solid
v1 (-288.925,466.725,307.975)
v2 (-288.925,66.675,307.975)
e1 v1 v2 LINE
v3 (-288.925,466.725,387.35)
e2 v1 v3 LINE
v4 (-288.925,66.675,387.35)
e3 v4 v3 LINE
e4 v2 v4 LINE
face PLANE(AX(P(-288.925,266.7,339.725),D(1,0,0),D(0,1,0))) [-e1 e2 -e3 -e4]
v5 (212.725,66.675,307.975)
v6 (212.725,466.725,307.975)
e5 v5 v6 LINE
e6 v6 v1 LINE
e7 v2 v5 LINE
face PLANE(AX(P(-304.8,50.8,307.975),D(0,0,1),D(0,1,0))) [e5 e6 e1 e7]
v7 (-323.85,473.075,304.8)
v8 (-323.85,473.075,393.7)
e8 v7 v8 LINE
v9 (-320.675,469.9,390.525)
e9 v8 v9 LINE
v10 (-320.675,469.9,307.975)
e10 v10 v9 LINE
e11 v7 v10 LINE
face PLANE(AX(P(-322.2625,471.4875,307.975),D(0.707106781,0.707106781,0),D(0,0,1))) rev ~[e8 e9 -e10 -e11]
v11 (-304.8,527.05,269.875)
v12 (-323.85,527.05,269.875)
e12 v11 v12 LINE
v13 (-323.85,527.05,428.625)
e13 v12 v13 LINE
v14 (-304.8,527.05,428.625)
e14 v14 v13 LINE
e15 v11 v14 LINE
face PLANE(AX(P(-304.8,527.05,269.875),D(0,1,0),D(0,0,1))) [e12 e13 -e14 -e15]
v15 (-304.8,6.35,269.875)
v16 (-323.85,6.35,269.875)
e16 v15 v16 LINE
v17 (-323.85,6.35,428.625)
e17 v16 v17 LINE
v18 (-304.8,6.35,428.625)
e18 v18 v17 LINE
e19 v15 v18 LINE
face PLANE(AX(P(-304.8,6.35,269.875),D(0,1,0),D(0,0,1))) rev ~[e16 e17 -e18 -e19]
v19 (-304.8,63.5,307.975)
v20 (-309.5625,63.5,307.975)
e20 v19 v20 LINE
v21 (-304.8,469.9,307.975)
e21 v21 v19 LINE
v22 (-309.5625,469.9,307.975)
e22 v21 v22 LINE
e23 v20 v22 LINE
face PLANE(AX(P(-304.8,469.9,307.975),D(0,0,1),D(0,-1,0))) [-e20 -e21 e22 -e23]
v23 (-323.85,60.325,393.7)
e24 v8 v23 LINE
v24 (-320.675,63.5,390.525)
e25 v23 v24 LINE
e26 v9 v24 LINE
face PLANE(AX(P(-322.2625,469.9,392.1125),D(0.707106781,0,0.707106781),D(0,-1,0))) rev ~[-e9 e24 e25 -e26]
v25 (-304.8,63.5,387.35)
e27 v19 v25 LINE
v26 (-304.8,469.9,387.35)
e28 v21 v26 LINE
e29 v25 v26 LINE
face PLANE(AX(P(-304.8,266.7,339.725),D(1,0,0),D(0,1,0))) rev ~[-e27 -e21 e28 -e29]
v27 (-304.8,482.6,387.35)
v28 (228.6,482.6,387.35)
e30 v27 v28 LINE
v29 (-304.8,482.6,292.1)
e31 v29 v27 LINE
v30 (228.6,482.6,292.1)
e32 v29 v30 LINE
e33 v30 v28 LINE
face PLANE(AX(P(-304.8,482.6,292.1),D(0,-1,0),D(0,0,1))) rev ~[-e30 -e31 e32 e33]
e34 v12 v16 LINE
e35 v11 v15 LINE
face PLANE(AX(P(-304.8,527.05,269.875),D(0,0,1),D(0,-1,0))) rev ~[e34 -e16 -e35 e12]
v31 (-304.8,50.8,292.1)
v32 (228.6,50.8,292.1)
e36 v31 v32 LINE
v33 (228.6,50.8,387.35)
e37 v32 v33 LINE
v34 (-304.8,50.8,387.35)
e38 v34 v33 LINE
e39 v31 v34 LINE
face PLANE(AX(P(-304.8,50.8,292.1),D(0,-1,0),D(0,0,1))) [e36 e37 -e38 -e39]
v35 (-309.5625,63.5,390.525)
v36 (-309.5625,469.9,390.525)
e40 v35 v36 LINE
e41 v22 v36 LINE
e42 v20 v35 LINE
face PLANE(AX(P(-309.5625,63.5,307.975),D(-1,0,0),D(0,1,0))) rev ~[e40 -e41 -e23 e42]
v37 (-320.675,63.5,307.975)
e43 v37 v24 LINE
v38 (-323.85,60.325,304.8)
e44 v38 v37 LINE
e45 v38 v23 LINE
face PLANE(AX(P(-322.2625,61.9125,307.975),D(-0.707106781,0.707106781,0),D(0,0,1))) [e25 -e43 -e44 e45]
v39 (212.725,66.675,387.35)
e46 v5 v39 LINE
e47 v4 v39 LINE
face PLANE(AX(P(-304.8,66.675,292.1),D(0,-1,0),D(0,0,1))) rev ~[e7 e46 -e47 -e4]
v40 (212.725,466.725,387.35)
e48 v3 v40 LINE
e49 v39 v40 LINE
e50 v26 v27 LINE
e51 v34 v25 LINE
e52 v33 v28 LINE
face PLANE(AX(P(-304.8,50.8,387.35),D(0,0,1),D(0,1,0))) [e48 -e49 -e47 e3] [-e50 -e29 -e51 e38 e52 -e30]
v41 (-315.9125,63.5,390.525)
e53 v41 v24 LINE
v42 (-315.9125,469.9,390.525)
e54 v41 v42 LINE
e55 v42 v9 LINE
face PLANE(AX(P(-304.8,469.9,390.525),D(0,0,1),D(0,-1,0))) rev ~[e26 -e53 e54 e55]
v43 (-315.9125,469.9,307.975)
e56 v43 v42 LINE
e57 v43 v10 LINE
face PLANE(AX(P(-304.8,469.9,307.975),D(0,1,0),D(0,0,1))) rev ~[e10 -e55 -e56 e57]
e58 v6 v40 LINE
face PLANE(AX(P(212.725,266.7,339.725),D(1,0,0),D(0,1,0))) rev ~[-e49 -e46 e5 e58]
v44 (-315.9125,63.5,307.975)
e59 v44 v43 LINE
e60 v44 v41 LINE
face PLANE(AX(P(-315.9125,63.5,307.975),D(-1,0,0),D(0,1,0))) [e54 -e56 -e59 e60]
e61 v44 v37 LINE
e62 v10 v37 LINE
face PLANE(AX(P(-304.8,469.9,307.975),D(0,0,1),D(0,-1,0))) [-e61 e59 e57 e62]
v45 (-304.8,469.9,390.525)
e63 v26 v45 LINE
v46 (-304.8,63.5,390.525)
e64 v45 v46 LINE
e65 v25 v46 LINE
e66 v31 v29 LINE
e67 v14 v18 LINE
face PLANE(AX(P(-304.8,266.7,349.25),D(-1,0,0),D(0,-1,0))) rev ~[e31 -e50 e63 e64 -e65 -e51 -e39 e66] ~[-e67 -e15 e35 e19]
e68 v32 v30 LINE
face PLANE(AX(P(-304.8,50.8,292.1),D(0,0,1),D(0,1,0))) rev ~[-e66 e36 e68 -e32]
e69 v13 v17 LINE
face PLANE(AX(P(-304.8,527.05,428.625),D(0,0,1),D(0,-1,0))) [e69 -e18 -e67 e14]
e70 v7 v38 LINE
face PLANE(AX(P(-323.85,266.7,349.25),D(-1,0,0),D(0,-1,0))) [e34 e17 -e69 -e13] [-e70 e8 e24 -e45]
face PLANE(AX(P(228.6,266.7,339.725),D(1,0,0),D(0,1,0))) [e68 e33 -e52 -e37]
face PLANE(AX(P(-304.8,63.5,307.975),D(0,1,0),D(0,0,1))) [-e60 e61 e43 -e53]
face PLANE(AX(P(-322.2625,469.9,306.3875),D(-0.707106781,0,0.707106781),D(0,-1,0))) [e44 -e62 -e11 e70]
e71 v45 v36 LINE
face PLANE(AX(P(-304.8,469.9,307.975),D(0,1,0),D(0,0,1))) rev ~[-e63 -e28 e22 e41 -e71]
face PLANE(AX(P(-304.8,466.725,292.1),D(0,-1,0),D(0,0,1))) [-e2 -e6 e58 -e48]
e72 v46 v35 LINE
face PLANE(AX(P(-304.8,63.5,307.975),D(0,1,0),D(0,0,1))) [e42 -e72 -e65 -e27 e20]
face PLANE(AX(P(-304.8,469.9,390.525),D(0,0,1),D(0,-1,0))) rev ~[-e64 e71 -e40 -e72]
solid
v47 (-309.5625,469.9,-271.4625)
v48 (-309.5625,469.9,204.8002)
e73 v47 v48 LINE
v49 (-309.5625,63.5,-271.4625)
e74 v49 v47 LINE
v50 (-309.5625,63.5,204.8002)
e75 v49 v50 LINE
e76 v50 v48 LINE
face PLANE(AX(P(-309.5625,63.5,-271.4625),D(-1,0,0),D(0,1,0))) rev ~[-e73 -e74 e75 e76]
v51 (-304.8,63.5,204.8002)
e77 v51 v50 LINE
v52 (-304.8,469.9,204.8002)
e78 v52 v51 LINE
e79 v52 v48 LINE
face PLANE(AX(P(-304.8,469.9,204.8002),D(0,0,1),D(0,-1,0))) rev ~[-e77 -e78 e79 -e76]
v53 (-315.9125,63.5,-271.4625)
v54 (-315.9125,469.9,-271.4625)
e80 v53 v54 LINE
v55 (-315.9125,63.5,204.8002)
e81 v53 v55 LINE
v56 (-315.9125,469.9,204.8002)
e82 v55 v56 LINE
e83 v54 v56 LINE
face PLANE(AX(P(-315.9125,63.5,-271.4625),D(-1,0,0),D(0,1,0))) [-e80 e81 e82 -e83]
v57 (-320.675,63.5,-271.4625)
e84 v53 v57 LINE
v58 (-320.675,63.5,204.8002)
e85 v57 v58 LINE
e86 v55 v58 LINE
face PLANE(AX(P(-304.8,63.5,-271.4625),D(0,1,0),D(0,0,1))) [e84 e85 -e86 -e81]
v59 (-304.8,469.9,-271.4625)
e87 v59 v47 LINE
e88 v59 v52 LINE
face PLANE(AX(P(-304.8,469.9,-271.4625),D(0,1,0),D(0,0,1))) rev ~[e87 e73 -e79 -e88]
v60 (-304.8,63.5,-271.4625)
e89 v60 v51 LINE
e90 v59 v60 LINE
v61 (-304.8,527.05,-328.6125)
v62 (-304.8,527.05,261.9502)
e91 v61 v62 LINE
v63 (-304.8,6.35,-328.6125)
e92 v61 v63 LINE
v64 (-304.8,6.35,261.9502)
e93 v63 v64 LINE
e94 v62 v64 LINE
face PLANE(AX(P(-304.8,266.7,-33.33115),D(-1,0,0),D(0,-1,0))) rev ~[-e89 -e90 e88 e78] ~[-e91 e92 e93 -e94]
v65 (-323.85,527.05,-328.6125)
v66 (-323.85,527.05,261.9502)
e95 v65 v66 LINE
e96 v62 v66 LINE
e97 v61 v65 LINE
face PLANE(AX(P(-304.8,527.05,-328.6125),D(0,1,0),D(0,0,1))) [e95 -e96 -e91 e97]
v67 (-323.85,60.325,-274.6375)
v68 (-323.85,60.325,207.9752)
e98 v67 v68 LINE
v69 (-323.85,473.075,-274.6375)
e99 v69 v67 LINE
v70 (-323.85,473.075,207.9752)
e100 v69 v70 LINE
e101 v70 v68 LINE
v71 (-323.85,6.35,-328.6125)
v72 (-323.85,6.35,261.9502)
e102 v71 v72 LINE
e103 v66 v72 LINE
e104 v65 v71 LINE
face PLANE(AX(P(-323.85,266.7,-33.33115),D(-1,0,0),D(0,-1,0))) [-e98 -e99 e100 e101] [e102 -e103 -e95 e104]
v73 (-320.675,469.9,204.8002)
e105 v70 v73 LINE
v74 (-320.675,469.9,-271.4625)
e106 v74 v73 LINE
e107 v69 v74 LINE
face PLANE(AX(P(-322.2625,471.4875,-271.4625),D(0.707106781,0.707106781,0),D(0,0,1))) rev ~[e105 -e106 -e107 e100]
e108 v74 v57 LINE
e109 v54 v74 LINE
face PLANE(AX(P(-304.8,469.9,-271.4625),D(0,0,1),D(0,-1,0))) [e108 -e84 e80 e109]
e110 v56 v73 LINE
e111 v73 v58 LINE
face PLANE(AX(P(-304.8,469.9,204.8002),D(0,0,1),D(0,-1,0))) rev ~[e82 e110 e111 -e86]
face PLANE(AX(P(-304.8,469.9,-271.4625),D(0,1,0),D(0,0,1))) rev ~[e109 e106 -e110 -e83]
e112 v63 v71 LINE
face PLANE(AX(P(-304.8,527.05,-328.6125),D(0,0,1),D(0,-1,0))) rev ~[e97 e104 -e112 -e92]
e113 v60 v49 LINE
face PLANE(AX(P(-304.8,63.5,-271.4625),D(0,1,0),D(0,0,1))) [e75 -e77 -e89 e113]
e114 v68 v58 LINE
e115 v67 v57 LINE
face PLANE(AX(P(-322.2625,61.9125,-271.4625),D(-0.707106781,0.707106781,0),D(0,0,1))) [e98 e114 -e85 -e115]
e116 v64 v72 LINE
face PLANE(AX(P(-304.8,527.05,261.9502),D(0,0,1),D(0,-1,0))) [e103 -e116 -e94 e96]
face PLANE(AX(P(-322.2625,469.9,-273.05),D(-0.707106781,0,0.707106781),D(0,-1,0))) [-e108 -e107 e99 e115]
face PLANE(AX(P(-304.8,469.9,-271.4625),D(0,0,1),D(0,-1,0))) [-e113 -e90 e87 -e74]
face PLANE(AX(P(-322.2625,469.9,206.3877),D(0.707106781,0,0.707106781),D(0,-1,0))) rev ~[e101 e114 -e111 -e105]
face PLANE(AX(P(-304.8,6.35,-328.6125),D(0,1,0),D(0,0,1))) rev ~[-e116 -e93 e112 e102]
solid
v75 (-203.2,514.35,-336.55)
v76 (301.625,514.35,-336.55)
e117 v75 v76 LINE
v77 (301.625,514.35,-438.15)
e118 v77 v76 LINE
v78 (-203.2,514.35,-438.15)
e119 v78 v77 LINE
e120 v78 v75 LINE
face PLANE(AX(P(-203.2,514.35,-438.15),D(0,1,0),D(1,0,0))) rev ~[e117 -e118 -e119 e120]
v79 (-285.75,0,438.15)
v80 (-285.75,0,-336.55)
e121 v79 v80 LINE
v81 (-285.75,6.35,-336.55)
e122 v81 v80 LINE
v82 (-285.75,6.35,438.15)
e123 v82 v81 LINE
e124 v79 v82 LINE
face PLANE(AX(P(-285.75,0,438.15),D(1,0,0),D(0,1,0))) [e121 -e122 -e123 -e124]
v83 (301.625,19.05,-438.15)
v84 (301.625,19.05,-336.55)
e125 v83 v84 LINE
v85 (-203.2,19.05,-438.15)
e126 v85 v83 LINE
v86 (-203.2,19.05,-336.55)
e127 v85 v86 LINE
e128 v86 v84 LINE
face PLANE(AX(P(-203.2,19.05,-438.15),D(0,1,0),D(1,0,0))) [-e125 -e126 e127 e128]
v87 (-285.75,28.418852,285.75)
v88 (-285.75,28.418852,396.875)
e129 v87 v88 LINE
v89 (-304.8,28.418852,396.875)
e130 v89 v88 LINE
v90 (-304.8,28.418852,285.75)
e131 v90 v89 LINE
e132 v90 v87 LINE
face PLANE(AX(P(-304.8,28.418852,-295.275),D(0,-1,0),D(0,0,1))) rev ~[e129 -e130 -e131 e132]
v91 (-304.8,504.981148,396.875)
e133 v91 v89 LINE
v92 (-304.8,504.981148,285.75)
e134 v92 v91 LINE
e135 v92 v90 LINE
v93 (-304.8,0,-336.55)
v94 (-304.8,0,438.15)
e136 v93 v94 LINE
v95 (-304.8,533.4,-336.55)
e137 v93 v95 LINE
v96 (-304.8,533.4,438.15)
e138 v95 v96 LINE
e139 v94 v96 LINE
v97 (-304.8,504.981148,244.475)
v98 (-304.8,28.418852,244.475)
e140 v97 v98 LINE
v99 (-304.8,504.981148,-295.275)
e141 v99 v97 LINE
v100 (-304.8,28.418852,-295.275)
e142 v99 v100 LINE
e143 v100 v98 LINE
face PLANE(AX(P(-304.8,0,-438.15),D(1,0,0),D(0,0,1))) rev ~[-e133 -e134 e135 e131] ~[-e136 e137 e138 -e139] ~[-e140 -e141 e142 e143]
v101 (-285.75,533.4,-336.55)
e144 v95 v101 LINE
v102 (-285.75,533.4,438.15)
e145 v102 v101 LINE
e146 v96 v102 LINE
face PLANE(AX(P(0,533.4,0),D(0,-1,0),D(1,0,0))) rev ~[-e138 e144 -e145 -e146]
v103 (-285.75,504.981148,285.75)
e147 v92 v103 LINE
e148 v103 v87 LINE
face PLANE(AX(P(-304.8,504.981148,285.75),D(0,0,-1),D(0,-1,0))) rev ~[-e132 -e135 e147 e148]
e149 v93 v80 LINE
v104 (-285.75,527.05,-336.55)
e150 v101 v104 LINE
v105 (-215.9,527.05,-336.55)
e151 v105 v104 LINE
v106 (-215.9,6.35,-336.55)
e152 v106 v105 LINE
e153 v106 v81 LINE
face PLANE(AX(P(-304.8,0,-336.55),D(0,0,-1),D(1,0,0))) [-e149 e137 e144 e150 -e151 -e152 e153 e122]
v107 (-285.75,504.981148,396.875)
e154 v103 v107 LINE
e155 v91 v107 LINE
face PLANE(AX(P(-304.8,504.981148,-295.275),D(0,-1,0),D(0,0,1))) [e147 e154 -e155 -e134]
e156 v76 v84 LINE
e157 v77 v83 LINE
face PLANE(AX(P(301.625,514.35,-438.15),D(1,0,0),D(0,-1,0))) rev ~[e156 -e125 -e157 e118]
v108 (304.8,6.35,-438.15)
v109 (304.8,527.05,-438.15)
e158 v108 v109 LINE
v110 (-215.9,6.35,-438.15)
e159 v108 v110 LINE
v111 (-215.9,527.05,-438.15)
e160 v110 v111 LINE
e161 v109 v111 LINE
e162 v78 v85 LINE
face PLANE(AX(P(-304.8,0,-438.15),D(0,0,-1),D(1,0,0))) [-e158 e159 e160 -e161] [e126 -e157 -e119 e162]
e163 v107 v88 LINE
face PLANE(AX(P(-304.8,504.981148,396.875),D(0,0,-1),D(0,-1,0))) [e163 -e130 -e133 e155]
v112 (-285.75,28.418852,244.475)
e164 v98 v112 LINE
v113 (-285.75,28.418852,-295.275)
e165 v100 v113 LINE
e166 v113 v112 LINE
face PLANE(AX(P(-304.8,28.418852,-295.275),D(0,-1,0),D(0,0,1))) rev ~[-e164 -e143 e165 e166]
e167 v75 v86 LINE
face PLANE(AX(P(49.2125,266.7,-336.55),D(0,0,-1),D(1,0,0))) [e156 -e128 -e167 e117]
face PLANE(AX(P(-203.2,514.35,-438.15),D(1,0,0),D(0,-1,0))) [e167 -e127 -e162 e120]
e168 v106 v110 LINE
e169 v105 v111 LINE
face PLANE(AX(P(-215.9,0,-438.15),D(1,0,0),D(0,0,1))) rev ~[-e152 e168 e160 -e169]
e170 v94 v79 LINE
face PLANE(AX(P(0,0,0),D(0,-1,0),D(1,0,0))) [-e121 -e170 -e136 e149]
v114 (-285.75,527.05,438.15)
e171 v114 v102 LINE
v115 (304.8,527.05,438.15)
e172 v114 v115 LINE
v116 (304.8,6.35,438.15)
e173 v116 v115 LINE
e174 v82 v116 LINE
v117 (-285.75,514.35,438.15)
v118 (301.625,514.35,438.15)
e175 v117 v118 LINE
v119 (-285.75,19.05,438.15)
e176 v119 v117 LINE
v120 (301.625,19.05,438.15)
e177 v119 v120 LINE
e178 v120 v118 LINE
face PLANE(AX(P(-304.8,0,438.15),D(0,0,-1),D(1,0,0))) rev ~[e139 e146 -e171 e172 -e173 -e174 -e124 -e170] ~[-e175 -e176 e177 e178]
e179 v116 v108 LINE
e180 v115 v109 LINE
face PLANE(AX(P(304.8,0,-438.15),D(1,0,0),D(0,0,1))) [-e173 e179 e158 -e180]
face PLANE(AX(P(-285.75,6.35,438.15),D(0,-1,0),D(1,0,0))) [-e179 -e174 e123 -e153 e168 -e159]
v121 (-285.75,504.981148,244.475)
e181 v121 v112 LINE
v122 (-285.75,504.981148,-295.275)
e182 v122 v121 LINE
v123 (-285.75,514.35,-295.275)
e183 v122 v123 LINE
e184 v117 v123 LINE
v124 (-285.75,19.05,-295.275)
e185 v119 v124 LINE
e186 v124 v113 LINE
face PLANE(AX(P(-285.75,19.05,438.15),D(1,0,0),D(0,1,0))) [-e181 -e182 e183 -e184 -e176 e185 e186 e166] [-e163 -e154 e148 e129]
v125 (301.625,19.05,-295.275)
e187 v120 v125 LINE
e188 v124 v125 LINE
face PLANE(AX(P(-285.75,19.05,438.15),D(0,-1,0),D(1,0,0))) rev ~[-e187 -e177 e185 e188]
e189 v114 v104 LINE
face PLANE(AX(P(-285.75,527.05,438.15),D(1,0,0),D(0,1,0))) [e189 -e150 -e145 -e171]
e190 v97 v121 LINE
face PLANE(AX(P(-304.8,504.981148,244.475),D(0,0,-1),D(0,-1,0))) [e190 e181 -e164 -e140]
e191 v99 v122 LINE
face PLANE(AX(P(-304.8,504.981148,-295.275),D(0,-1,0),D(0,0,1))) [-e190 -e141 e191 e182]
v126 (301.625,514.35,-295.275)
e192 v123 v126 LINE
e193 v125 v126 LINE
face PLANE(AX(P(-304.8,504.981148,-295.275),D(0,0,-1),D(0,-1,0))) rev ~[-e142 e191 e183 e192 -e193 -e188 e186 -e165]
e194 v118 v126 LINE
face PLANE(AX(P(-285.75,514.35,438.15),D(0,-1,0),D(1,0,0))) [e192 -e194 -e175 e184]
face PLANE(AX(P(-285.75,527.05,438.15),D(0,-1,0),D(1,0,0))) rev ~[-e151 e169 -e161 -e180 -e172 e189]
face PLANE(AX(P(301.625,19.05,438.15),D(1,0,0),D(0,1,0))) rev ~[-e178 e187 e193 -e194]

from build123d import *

# Parameters (mm, degrees)
F0_W          = 609.6
F0_H          = 876.3
F1_DEPTH      = 533.4
F2_W          = 88.9
F2_H          = 101.6
F3_DEPTH      = 533.401
F4_W          = 476.562295082
F4_H          = 692.15
F5_DEPTH      = 19.05
F6_W          = 590.55
F6_H          = 6.35
F7_DEPTH      = 876.301
F8_W          = 587.375
F8_H          = 495.3
F9_DEPTH      = 733.425
F10_W         = 476.562295082
F10_H         = 41.275
F11_DEPTH     = 19.05
F12_W         = 520.7
F12_H         = 590.5627
F12_W_2       = 406.4
F12_H_2       = 476.2627
F13_DEPTH     = 19.05
F14_W         = 6.35
F14_H         = 406.4
F15_DEPTH     = 476.2627
F16_SIZE      = 3.175
F17_W         = 520.7
F17_H         = 158.75
F17_W_2       = 406.4
F17_H_2       = 82.55
F18_DEPTH     = 19.05
F19_W         = 6.35
F19_H         = 406.4
F20_DEPTH     = 82.55
F21_SIZE      = 3.175
F22_W         = 504.825
F22_H         = 495.3
F23_DEPTH     = 101.6
F24_W         = 431.8
F24_H         = 95.25
F25_DEPTH     = 533.4
F26_T         = 15.875
F26_T3_DEPTH  = 37.249261314
F26_T5_DEPTH  = 37.249261314
F26_T7_DEPTH  = 37.249261314
F26_T9_DEPTH  = 37.249261314
F26_T11_DEPTH = 36.5125
F26_T13_DEPTH = 438.15
F26_T15_DEPTH = 114.3
F26_T17_DEPTH = 127
F26_T19_DEPTH = 463.55
F26_T21_DEPTH = 111.125
F26_T23_DEPTH = 36.5125


# Not quite as in the source:
# - a shell that OpenCascade refuses in one call is made with other operations: the cavity is built on its own and cut out


with BuildPart() as f1:
    # F0 (on Front) → F1 (new body)
    with BuildSketch(Plane.XZ):
        Rectangle(F0_W, F0_H)
    extrude(amount=-F1_DEPTH)

    # F2 (on face) → F3 (cut, through all)
    with BuildSketch(Plane.XZ):
        with Locations((-260.35, -387.35)):
            Rectangle(F2_W, F2_H)
    extrude(amount=-F3_DEPTH, mode=Mode.SUBTRACT)

    # F4 (on face) → F5 (cut)
    with BuildSketch(Plane(origin=(-304.8, 0, 0), x_dir=(0, -1, 0), z_dir=(-1, 0, 0))):
        with Locations((-266.7, 50.8)):
            Rectangle(F4_W, F4_H)
    extrude(amount=-F5_DEPTH, mode=Mode.SUBTRACT)

    # F6 (on face) → F7 (cut, through all)
    with BuildSketch(Plane.XY.offset(438.15)):
        with Locations((9.525, 530.225)):
            Rectangle(F6_W, F6_H)
        with Locations((9.525, 3.175)):
            Rectangle(F6_W, F6_H)
    extrude(amount=-F7_DEPTH, mode=Mode.SUBTRACT)

    # F8 (on face) → F9 (cut, through all)
    with BuildSketch(Plane.XY.offset(438.15)):
        with Locations((7.9375, 266.7)):
            Rectangle(F8_W, F8_H)
    extrude(amount=-F9_DEPTH, mode=Mode.SUBTRACT)

    # F10 (on face) → F11 (join, through all)
    with BuildSketch(Plane(origin=(-304.8, 0, 0), x_dir=(0, -1, 0), z_dir=(-1, 0, 0))):
        with Locations((-266.7, 265.1125)):
            Rectangle(F10_W, F10_H)
    extrude(amount=-F11_DEPTH)

    # F22 (on face) → F23 (cut)
    with BuildSketch(Plane(origin=(0, 0, -438.15), x_dir=(1, 0, 0), z_dir=(0, 0, -1))):
        with Locations((49.2125, -266.7)):
            Rectangle(F22_W, F22_H)
    extrude(amount=-F23_DEPTH, mode=Mode.SUBTRACT)


with BuildPart() as f13:
    # F12 (on face) → F13 (new body)
    with BuildSketch(Plane(origin=(-304.8, 0, 0), x_dir=(0, -1, 0), z_dir=(-1, 0, 0))):
        with Locations((-266.7, -33.33115)):
            Rectangle(F12_W, F12_H)
        with Locations((-266.7, -33.33115)):
            Rectangle(F12_W_2, F12_H_2, mode=Mode.SUBTRACT)
    extrude(amount=F13_DEPTH)

    # F14 (on face) → F15 (join, through all)
    with BuildSketch(Plane.XY.offset(-271.4625)):
        with Locations((-312.7375, 266.7)):
            Rectangle(F14_W, F14_H)
    extrude(amount=F15_DEPTH)

    # F16
    f16_edges = [f13.edges().sort_by_distance(p)[0] for p in [
        (-323.85, 469.9, -33.33115),
        (-323.85, 266.7, -271.4625),
        (-323.85, 63.5, -33.33115),
        (-323.85, 266.7, 204.8002),
    ]]
    chamfer(f16_edges, length=F16_SIZE)


with BuildPart() as f18:
    # F17 (on face) → F18 (new body)
    with BuildSketch(Plane(origin=(-304.8, 0, 0), x_dir=(0, -1, 0), z_dir=(-1, 0, 0))):
        with Locations((-266.7, 349.25)):
            Rectangle(F17_W, F17_H)
        with Locations((-266.7, 349.25)):
            Rectangle(F17_W_2, F17_H_2, mode=Mode.SUBTRACT)
    extrude(amount=F18_DEPTH)

    # F19 (on face) → F20 (join, through all)
    with BuildSketch(Plane.XY.offset(307.975)):
        with Locations((-312.7375, 266.7)):
            Rectangle(F19_W, F19_H)
    extrude(amount=F20_DEPTH)

    # F21
    f21_edges = [f18.edges().sort_by_distance(p)[0] for p in [
        (-323.85, 266.7, 307.975),
        (-323.85, 469.9, 349.25),
        (-323.85, 266.7, 390.525),
        (-323.85, 63.5, 349.25),
    ]]
    chamfer(f21_edges, length=F21_SIZE)

    # F24 (on face) → F25 (join)
    with BuildSketch(Plane.YZ.offset(-304.8)):
        with Locations((266.7, 339.725)):
            Rectangle(F24_W, F24_H)
    extrude(amount=F25_DEPTH)

    # F26: shell of thickness 15.875, made by hand


with BuildPart() as f26_core1:
    # F26_t2: copy of F18
    add(f18.part)

    # the walls: a layer under each face that stays
    f26_faces = [f26_core1.faces().sort_by_distance(p)[0] for p in [
        (-323.85, 440.2666666667, 296.3333333333),
        (-322.2625, 266.7, 306.3875),
        (-322.2625, 61.9125, 349.25),
        (-322.2625, 471.4875, 349.25),
        (-322.2625, 266.7, 392.1125),
        (-314.325, 266.7, 428.625),
        (-314.325, 527.05, 349.25),
        (-314.325, 266.7, 269.875),
        (-314.325, 6.35, 349.25),
        (-318.29375, 266.7, 307.975),
        (-318.29375, 63.5, 349.25),
        (-318.29375, 469.9, 349.25),
        (-318.29375, 266.7, 390.525),
        (-304.8, 440.2666666667, 402.1666666667),
        (-315.9125, 266.7, 349.25),
        (-38.1, 482.6, 339.725),
        (-38.1, 266.7, 292.1),
        (-38.1, 50.8, 339.725),
        (-307.18125, 63.5, 349.25),
        (-307.18125, 266.7, 390.525),
        (-307.18125, 469.9, 349.25),
        (-304.8, 266.7, 347.6625),
        (228.6, 266.7, 339.725),
        (-307.18125, 266.7, 307.975),
        (-309.5625, 266.7, 349.25),
    ]]
    thicken(f26_faces, amount=-F26_T, mode=Mode.SUBTRACT)

    # F26_s4 → F26_t3 (cut)
    with BuildSketch(Plane(origin=(4.5928978099, 4.5928978099, 4.5928978099), x_dir=(-0.7071067812, 0.7071067812, 0), z_dir=(0.5773502692, 0.5773502692, 0.5773502692))):
        Polygon((271.8908726623, 356.5892701441), (263.7152476623, 342.7036353262), (255.7777476623, 347.2863530879), (255.7777476623, 356.4517886113), align=None)
    extrude(amount=F26_T3_DEPTH, mode=Mode.SUBTRACT)

    # F26_s6 → F26_t5 (cut)
    with BuildSketch(Plane(origin=(-173.2071021901, 173.2071021901, -173.2071021901), x_dir=(0.7071067812, 0.7071067812, 0), z_dir=(0.5773502692, -0.5773502692, 0.5773502692))):
        Polygon((105.2798844226, 574.3489082775), (113.4555094226, 560.4632734596), (121.3930094226, 565.0459912213), (121.3930094226, 574.2114267447), align=None)
    extrude(amount=F26_T5_DEPTH, mode=Mode.SUBTRACT)

    # F26_s8 → F26_t7 (cut)
    with BuildSketch(Plane(origin=(-228.2404355234, -228.2404355234, 228.2404355234), x_dir=(-0.7071067812, 0.7071067812, 0), z_dir=(0.5773502692, 0.5773502692, -0.5773502692))):
        Polygon((271.8908726623, 213.7335916339), (255.7777476623, 213.8710731668), (255.7777476623, 223.0365086901), (263.7152476623, 227.6192264518), align=None)
    extrude(amount=F26_T7_DEPTH, mode=Mode.SUBTRACT)

    # F26_s10 → F26_t9 (cut)
    with BuildSketch(Plane(origin=(-406.0404355234, 406.0404355234, 406.0404355234), x_dir=(0.7071067812, 0.7071067812, 0), z_dir=(0.5773502692, -0.5773502692, -0.5773502692))):
        Polygon((105.2798844226, -4.0260464995), (121.3930094226, -3.8885649667), (121.3930094226, 5.2768705567), (113.4555094226, 9.8595883184), align=None)
    extrude(amount=F26_T9_DEPTH, mode=Mode.SUBTRACT)

    # F26_s12 → F26_t11 (cut)
    with BuildSketch(Plane.YZ.offset(-336.55)):
        Polygon((469.74125, 308.13375), (469.9, 292.1), (485.775, 292.1), (485.775, 307.975), align=None)
        Polygon((63.65875, 308.13375), (63.5, 292.1), (47.625, 292.1), (47.625, 307.975), align=None)
        Polygon((63.65875, 390.36625), (47.625, 390.525), (47.625, 406.4), (63.5, 406.4), align=None)
        Polygon((469.74125, 390.36625), (485.775, 390.525), (485.775, 406.4), (469.9, 406.4), align=None)
    extrude(amount=F26_T11_DEPTH, mode=Mode.SUBTRACT)

    # F26_s14 → F26_t13 (cut)
    with BuildSketch(Plane.XZ.offset(-485.775)):
        Polygon((-316.07125, 308.13375), (-315.9125, 292.1), (-300.0375, 292.1), (-300.0375, 307.975), align=None)
        Polygon((-316.07125, 390.36625), (-315.9125, 406.4), (-300.0375, 406.4), (-300.0375, 390.525), align=None)
        Polygon((-309.40375, 390.36625), (-309.5625, 406.4), (-325.4375, 406.4), (-325.4375, 390.525), align=None)
        Polygon((-304.95875, 308.13375), (-288.925, 307.975), (-288.925, 292.1), (-304.8, 292.1), align=None)
        Polygon((-309.40375, 308.13375), (-309.5625, 292.1), (-325.4375, 292.1), (-325.4375, 307.975), align=None)
    extrude(amount=F26_T13_DEPTH, mode=Mode.SUBTRACT)

    # F26_s16 → F26_t15 (cut)
    with BuildSketch(Plane.XY.offset(292.1)):
        Polygon((-316.07125, 63.65875), (-315.9125, 47.625), (-300.0375, 47.625), (-300.0375, 63.5), align=None)
        Polygon((-316.07125, 469.74125), (-315.9125, 485.775), (-300.0375, 485.775), (-300.0375, 469.9), align=None)
        Polygon((-309.40375, 63.65875), (-309.5625, 47.625), (-325.4375, 47.625), (-325.4375, 63.5), align=None)
        Polygon((-309.40375, 469.74125), (-309.5625, 485.775), (-325.4375, 485.775), (-325.4375, 469.9), align=None)
    extrude(amount=F26_T15_DEPTH, mode=Mode.SUBTRACT)

    # F26_s18 → F26_t17 (cut)
    with BuildSketch(Plane.XY.offset(276.225)):
        Polygon((-304.64125, 482.75875), (-320.675, 482.6), (-320.675, 466.725), (-304.8, 466.725), align=None)
        Polygon((-304.64125, 50.64125), (-320.675, 50.8), (-320.675, 66.675), (-304.8, 66.675), align=None)
    extrude(amount=F26_T17_DEPTH, mode=Mode.SUBTRACT)

    # F26_s20 → F26_t19 (cut)
    with BuildSketch(Plane.XZ.offset(-498.475)):
        Polygon((-304.64125, 291.94125), (-320.675, 292.1), (-320.675, 307.975), (-304.8, 307.975), align=None)
    extrude(amount=F26_T19_DEPTH, mode=Mode.SUBTRACT)

    # F26_s22 → F26_t21 (cut)
    with BuildSketch(Plane.XY.offset(292.1)):
        Polygon((-304.95875, 63.65875), (-304.8, 47.625), (-288.925, 47.625), (-288.925, 63.5), align=None)
        Polygon((-304.95875, 469.74125), (-304.8, 485.775), (-288.925, 485.775), (-288.925, 469.9), align=None)
    extrude(amount=F26_T21_DEPTH, mode=Mode.SUBTRACT)

    # F26_s24 → F26_t23 (cut)
    with BuildSketch(Plane.YZ.offset(-325.4375)):
        Polygon((63.65875, 308.13375), (47.625, 307.975), (47.625, 292.1), (63.5, 292.1), align=None)
        Polygon((63.65875, 390.36625), (47.625, 390.525), (47.625, 406.4), (63.5, 406.4), align=None)
        Polygon((469.74125, 390.36625), (469.9, 406.4), (485.775, 406.4), (485.775, 390.525), align=None)
        Polygon((469.74125, 308.13375), (485.775, 307.975), (485.775, 292.1), (469.9, 292.1), align=None)
    extrude(amount=F26_T23_DEPTH, mode=Mode.SUBTRACT)


with BuildPart() as f18_1:
    add(f18.part)

    # what is left inside the walls is the cavity
    f26_cavity = [f26_core1.part.solids().sort_by_distance(p)[0] for p in [
        (45.508333, 266.7, 308.13375),
    ]]
    add(f26_cavity, mode=Mode.SUBTRACT)


solid = Compound([f1.part, f13.part, f18_1.part])
